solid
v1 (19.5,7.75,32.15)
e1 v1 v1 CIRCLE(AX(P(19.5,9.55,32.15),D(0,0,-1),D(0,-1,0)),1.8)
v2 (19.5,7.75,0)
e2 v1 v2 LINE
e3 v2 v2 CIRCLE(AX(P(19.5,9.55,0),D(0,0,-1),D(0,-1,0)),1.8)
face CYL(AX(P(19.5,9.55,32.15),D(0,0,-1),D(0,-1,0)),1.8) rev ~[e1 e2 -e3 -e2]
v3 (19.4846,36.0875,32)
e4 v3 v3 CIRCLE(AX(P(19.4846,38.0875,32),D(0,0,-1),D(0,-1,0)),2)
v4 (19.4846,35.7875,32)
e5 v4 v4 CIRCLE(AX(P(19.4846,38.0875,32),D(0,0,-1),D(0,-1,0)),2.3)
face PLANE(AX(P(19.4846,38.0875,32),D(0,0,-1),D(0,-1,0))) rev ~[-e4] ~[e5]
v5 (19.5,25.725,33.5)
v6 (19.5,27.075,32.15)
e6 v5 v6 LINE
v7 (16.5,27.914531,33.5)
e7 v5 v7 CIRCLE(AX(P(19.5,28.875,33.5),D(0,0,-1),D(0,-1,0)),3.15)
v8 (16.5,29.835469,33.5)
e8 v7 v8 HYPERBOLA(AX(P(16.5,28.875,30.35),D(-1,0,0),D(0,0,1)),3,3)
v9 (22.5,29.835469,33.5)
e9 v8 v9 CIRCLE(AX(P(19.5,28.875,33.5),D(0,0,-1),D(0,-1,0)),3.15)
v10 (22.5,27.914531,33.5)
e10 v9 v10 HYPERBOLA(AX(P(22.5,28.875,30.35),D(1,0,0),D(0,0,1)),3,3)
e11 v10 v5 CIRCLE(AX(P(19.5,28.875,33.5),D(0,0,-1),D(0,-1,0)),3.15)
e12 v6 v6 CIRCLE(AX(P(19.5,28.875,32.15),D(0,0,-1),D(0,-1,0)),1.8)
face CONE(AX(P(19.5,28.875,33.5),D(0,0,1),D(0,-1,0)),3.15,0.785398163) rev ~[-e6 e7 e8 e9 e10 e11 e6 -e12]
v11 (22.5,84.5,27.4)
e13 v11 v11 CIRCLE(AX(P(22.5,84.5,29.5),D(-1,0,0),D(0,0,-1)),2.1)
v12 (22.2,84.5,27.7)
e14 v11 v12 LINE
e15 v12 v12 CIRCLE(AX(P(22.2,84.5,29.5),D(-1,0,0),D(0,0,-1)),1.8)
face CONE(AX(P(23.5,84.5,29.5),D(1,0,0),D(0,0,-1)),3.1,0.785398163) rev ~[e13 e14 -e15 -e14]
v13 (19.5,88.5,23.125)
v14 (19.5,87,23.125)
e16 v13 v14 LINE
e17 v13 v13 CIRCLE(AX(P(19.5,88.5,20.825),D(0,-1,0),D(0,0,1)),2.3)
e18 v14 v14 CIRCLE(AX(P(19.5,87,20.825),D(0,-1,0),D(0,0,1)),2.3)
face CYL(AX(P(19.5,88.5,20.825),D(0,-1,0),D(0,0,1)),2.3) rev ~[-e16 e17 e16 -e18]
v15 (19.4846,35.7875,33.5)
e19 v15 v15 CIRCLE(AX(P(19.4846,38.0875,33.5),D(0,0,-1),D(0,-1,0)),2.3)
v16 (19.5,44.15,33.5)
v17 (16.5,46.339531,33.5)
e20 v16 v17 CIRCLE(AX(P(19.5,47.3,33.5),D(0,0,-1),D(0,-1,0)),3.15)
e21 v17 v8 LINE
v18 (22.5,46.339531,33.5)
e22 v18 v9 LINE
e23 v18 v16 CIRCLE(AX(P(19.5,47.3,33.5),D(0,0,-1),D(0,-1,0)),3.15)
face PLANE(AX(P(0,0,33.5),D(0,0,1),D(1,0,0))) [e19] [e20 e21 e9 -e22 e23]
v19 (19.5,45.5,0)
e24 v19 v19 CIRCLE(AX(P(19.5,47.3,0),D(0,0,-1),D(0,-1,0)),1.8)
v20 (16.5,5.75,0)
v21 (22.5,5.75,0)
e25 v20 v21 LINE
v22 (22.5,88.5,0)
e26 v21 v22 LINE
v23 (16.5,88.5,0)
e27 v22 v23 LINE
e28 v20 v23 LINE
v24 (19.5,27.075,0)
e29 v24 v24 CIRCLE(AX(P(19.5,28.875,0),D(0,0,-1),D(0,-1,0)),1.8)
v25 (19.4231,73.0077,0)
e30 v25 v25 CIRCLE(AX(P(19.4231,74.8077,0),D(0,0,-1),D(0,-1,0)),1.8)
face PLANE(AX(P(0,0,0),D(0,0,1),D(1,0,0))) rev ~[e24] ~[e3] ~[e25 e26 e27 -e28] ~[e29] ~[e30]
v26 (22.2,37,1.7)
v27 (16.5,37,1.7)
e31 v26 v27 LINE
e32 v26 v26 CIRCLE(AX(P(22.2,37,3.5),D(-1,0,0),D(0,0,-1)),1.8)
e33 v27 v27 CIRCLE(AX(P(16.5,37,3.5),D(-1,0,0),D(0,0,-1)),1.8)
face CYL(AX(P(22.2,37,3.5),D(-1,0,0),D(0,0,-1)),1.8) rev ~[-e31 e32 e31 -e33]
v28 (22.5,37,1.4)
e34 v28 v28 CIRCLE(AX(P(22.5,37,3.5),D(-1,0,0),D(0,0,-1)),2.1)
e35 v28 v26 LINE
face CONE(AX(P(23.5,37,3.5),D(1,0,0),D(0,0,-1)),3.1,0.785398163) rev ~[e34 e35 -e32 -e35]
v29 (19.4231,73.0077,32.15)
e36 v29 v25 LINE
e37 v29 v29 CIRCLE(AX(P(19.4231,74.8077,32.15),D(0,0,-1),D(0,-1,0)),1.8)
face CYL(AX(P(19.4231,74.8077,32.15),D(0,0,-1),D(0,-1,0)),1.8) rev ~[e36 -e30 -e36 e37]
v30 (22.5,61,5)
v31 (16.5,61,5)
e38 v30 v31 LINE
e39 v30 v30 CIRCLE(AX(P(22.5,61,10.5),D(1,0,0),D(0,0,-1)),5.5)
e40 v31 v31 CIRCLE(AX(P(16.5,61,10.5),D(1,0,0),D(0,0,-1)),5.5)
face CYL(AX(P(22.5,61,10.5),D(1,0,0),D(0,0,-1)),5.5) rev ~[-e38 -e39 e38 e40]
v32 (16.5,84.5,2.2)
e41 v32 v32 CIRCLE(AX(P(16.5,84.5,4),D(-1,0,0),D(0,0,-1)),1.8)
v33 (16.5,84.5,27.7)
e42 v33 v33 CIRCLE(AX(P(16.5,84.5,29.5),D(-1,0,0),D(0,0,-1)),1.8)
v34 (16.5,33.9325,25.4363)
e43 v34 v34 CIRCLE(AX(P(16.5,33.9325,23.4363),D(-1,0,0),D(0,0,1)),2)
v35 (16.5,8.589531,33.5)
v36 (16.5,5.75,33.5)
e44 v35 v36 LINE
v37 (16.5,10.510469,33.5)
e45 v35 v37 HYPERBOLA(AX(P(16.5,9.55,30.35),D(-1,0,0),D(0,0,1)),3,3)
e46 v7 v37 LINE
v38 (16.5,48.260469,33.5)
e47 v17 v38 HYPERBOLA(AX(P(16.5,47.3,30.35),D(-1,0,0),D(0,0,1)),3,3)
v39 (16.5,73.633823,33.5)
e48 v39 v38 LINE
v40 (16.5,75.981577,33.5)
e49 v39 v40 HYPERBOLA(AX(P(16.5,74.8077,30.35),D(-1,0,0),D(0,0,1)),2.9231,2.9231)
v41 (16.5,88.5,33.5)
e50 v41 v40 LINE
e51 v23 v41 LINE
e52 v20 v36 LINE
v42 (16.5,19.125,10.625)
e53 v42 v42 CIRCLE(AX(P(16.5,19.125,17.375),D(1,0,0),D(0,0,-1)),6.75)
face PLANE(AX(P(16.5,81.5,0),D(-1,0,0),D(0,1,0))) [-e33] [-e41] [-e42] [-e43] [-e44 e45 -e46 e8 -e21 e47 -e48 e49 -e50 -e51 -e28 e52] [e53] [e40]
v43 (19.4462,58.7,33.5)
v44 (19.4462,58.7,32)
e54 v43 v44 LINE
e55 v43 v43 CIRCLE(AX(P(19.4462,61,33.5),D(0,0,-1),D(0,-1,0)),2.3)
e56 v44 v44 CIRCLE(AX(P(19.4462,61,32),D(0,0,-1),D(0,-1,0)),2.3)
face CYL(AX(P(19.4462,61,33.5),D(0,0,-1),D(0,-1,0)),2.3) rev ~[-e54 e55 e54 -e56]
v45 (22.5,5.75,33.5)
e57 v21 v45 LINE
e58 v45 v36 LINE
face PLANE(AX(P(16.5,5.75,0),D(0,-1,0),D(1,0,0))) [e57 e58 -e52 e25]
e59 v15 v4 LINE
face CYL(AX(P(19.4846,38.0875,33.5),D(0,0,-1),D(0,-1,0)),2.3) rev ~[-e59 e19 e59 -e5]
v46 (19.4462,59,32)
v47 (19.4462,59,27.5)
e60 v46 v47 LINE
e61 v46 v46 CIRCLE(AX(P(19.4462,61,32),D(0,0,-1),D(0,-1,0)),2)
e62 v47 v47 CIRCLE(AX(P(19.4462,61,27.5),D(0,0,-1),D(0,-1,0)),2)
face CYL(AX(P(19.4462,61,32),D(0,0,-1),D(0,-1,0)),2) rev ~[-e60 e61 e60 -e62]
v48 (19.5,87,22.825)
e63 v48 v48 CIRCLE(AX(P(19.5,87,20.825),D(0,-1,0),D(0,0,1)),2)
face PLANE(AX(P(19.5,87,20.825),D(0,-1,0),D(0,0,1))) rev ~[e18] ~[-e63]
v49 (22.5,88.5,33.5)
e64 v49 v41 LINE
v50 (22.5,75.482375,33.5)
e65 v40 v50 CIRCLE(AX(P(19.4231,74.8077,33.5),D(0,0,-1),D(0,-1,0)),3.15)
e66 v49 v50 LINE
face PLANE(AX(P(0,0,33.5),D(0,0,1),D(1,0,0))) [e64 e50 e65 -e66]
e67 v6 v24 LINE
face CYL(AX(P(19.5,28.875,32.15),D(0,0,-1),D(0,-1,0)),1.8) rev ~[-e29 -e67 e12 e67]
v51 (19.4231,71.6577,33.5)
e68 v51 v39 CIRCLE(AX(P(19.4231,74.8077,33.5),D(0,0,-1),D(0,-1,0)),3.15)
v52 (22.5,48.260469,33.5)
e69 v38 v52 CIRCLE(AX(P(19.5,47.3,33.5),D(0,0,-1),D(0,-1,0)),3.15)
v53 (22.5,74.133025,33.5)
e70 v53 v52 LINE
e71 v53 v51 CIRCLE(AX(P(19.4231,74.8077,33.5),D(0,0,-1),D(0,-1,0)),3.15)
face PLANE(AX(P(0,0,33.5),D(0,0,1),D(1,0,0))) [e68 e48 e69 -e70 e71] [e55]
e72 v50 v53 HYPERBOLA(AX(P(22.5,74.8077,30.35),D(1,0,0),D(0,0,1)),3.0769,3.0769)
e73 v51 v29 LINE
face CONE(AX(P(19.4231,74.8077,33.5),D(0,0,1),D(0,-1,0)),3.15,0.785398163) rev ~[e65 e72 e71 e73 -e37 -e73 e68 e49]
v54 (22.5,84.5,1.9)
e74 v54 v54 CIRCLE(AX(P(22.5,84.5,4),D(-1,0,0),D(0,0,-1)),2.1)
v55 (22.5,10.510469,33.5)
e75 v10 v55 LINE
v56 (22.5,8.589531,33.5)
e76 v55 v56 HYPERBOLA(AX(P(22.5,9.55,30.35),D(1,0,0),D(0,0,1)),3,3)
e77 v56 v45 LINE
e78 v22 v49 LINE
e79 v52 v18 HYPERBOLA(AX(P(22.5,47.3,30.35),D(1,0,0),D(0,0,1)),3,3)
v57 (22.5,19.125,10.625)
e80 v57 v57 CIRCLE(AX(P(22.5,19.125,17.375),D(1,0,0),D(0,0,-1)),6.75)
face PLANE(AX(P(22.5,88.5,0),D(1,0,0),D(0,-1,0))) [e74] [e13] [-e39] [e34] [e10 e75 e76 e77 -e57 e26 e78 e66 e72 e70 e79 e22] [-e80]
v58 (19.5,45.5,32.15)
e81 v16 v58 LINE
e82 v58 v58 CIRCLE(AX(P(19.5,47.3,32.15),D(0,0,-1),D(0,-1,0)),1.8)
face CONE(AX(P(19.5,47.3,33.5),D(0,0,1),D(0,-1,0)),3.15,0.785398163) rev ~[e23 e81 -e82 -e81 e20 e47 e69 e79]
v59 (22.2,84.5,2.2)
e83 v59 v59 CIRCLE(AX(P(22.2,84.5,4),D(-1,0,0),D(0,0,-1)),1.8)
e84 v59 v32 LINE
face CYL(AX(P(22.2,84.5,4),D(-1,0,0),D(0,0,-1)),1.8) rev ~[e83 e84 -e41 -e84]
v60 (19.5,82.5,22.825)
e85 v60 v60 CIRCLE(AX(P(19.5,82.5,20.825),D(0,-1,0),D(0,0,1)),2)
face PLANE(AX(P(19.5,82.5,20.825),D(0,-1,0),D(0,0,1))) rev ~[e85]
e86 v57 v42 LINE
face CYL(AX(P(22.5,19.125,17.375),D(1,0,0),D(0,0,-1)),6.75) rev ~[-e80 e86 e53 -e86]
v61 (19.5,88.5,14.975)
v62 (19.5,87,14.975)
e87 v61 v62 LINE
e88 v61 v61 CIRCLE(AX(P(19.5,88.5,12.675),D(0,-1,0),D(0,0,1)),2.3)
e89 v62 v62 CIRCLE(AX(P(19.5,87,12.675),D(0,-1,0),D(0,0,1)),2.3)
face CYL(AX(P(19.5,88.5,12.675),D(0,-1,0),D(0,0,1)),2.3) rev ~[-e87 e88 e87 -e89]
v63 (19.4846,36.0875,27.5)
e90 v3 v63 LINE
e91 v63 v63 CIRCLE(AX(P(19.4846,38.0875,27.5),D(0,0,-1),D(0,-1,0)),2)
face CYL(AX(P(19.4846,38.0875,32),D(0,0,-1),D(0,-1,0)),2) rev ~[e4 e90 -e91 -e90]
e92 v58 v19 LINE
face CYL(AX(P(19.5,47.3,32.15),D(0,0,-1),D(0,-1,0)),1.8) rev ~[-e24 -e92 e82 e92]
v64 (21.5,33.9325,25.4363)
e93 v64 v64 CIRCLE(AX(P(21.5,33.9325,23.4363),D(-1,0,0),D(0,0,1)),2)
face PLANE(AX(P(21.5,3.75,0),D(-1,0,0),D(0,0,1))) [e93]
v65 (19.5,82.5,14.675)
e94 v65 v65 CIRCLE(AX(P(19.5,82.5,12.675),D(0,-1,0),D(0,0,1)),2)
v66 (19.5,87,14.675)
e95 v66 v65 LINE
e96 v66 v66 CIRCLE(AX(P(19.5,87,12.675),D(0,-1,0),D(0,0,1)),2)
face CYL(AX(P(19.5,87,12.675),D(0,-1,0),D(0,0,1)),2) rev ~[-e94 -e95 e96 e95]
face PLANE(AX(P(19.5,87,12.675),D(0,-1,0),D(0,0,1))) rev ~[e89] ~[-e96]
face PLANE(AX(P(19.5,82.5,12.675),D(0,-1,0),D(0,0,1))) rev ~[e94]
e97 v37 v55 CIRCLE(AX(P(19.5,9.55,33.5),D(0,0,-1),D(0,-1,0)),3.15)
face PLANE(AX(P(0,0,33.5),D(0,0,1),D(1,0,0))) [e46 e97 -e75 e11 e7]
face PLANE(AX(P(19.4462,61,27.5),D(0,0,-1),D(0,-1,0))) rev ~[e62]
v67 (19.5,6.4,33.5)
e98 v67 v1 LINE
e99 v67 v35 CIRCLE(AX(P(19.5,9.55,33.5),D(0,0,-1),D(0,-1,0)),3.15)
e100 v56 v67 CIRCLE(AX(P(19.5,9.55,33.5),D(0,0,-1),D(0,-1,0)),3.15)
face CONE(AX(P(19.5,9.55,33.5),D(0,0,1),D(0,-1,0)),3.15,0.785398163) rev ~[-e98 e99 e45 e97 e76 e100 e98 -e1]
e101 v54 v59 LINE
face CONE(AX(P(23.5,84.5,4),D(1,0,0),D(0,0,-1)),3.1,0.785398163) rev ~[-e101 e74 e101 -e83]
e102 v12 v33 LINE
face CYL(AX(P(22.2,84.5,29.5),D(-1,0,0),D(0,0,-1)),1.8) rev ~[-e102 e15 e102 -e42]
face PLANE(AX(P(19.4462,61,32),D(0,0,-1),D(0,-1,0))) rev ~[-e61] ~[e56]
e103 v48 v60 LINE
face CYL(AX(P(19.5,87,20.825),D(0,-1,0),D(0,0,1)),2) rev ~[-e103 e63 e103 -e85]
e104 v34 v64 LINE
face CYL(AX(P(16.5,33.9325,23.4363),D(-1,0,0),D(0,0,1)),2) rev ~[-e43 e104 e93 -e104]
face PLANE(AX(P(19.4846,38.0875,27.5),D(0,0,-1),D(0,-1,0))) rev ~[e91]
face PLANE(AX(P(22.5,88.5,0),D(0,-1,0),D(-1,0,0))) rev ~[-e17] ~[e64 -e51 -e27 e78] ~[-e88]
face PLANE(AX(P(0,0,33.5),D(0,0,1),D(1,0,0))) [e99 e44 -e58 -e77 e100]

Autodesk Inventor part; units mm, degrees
ref_plane "YZ Plane" through (0, 0, 0) normal (1, 0, 0) x (0, 1, 0)
ref_plane "XZ Plane" through (0, 0, 0) normal (0, 1, 0) x (-1, 0, 0)
ref_plane "Work Plane1" through (0, 0, 0) normal (0, 0, 1) x (1, 0, 0)
sketch "Sketch1" plane through (0, 0, 0) normal (0, 0, 1) x (1, 0, 0)
  line L0 (23.5, 88.5) -> (-23.5, 88.5) projected
  line L1 (-23.5, 88.5) -> (-23.5, 36.5) projected
  line L2 (-26.5, 33.5) -> (-89, 33.5) projected
  line L3 (-89, 33.5) -> (-89, -72.5) projected
  line L4 (-89, -72.5) -> (-77, -72.5) projected
  line L5 (-74, -75.5) -> (-74, -93.5) projected
  line L6 (-74, -93.5) -> (74, -93.5) projected
  line L7 (74, -93.5) -> (74, -75.5) projected
  line L8 (77, -72.5) -> (89, -72.5) projected
  line L9 (89, -72.5) -> (89, 33.5) projected
  line L10 (89, 33.5) -> (26.5, 33.5) projected
  line L11 (23.5, 36.5) -> (23.5, 88.5) projected
  line L12 (-4.5, 81.5) -> (-4.5, 36.5) projected
  line L13 (-7.5, 33.5) -> (-13.5, 33.5) projected
  line L14 (-16.5, 36.5) -> (-16.5, 81.5) projected
  line L15 (-13.5, 84.5) -> (-7.5, 84.5) projected
  line L16 (16.5, 81.5) -> (16.5, 36.5) projected
  line L17 (13.5, 33.5) -> (7.5, 33.5) projected
  line L18 (4.5, 36.5) -> (4.5, 81.5) projected
  line L19 (7.5, 84.5) -> (13.5, 84.5) projected
  line L20 (16.5, 88.5) -> (22.5, 88.5)
  line L21 (22.5, 88.5) -> (22.5, 3.75)
  line L22 (22.5, 3.75) -> (16.5, 3.75)
  line L23 (16.5, 3.75) -> (16.5, 88.5)
  line L24 (59.9, 4.75) -> (32.2, 4.75)
  arc A0 (13.5, 33.5) -> (16.5, 36.5) centre (13.5, 36.5) ccw projected
  arc A1 (4.5, 36.5) -> (7.5, 33.5) centre (7.5, 36.5) ccw projected
  arc A2 (7.5, 84.5) -> (4.5, 81.5) centre (7.5, 81.5) ccw projected
  arc A3 (16.5, 81.5) -> (13.5, 84.5) centre (13.5, 81.5) ccw projected
  arc A4 (-4.5, 81.5) -> (-7.5, 84.5) centre (-7.5, 81.5) ccw projected
  arc A5 (-7.5, 33.5) -> (-4.5, 36.5) centre (-7.5, 36.5) ccw projected
  arc A6 (-16.5, 36.5) -> (-13.5, 33.5) centre (-13.5, 36.5) ccw projected
  arc A7 (-13.5, 84.5) -> (-16.5, 81.5) centre (-13.5, 81.5) ccw projected
  arc A8 (-26.5, 33.5) -> (-23.5, 36.5) centre (-26.5, 36.5) ccw projected
  arc A9 (-74, -75.5) -> (-77, -72.5) centre (-77, -75.5) ccw projected
  arc A10 (77, -72.5) -> (74, -75.5) centre (77, -75.5) ccw projected
  arc A11 (23.5, 36.5) -> (26.5, 33.5) centre (26.5, 36.5) ccw projected
  circle A12 centre (39.125, 25.9125) radius 1.0065 projected
  circle A13 centre (72.95, 12.275) radius 1.0065 projected
  circle A14 centre (-39.125, 12.3375) radius 1.0065 projected
  circle A15 centre (-72.95, 25.975) radius 1.0065 projected
  circle A16 centre (-72.95, 12.275) radius 1.0065 projected
  circle A17 centre (-39.125, 25.9125) radius 1.0065 projected
  circle A18 centre (72.95, 25.975) radius 1.0065 projected
  circle A19 centre (39.125, 12.3375) radius 1.0065 projected
  circle A20 centre (-42.4984, -44.6666) radius 1.2295 projected
  circle A21 centre (-79, -42.3889) radius 1.2295 projected
  circle A22 centre (-19.5, 28.875) radius 1.2295 projected
  circle A23 centre (19.5, 9.55) radius 1.2295 projected
  circle A24 centre (19.5, 47.3) radius 1.2295 projected
  circle A25 centre (-19.5, 47.3) radius 1.2295 projected
  circle A26 centre (0, 74.7) radius 1.2295 projected
  circle A27 centre (-19.4231, 74.8077) radius 1.2295 projected
  circle A28 centre (19.5, 74.7) radius 1.2295 projected
  circle A29 centre (0, 49.05) radius 1.2295 projected
  circle A30 centre (19.5, 28.875) radius 1.2295 projected
  circle A31 centre (0, 19.125) radius 1.2295 projected
  circle A32 centre (-19.5, 9.55) radius 1.2295 projected
  circle A33 centre (42.5, -44.6649) radius 1.2295 projected
  circle A34 centre (79, -42.3889) radius 1.2295 projected
  circle A35 centre (21.5, -85.5) radius 1.8 projected
  circle A36 centre (-64.5, -85.5) radius 1.8 projected
  circle A37 centre (-21.5, -85.5) radius 1.8 projected
  circle A38 centre (64.5, -85.5) radius 1.8 projected
  line L25 (-58.2315, -77.6013) -> (-80.7685, -61.1541) projected
  line L26 (-82, -58.7308) -> (-82, -48.3889) projected
  line L27 (-75.8885, -45.3972) -> (-47.1423, -47.5438) projected
  line L28 (-21.1, -26.5751) -> (-21.1, -22.0813) projected
  line L29 (-46.9357, -41.5592) -> (-76, -39.3889) projected
  line L30 (-82, -36.3889) -> (-82, 1.75) projected
  line L31 (32.9914, 4.75) -> (79, 4.75) projected
  line L32 (82, -48.3889) -> (82, -58.7308) projected
  line L33 (76, -39.3889) -> (46.9371, -41.5577) projected
  line L34 (21.1, -22.0813) -> (21.1, -26.5749) projected
  line L35 (47.144, -47.5423) -> (76, -45.3889) projected
  line L36 (82, 1.75) -> (82, -36.3889) projected
  line L37 (80.7685, -61.1541) -> (58.2315, -77.6013) projected
  line L38 (57, -80.0246) -> (57, -87.5) projected
  arc A39 (55, -89.5) -> (57, -87.5) centre (55, -87.5) ccw projected
  line L39 (55, -89.5) -> (31, -89.5) projected
  arc A40 (29, -87.5) -> (31, -89.5) centre (31, -87.5) ccw projected
  line L40 (29, -87.5) -> (29, -79.2522) projected
  line L41 (14, -79.5039) -> (14, -87.5) projected
  arc A41 (12, -89.5) -> (14, -87.5) centre (12, -87.5) ccw projected
  line L42 (12, -89.5) -> (-12, -89.5) projected
  arc A42 (-14, -87.5) -> (-12, -89.5) centre (-12, -87.5) ccw projected
  line L43 (-14, -87.5) -> (-14, -79.5039) projected
  line L44 (-29, -79.2522) -> (-29, -87.5) projected
  arc A43 (-31, -89.5) -> (-29, -87.5) centre (-31, -87.5) ccw projected
  line L45 (-31, -89.5) -> (-55, -89.5) projected
  arc A44 (-57, -87.5) -> (-55, -89.5) centre (-55, -87.5) ccw projected
  line L46 (-57, -87.5) -> (-57, -80.0246) projected
  line L47 (-66.95, 28.9125) -> (-45.125, 28.9125) projected
  line L48 (-42.125, 25.9125) -> (-42.125, 12.275) projected
  line L49 (-45.125, 9.275) -> (-66.95, 9.275) projected
  line L50 (-69.95, 12.275) -> (-69.95, 25.9125) projected
  line L51 (-16.5, 12.75) -> (-16.5, 25.5) projected
  line L52 (-13.5, 28.5) -> (-7.5, 28.5) projected
  line L53 (-4.5, 25.5) -> (-4.5, 12.75) projected
  line L54 (-7.5, 9.75) -> (-13.5, 9.75) projected
  line L55 (66.95, 9.3375) -> (45.125, 9.3375) projected
  line L56 (42.125, 12.3375) -> (42.125, 25.975) projected
  line L57 (45.125, 28.975) -> (66.95, 28.975) projected
  line L58 (69.95, 25.975) -> (69.95, 12.3375) projected
  line L59 (4.5, 12.75) -> (4.5, 25.5) projected
  line L60 (7.5, 28.5) -> (13.5, 28.5) projected
  line L61 (16.5, 25.5) -> (16.5, 12.75) projected
  line L62 (13.5, 9.75) -> (7.5, 9.75) projected
  line L63 (44.5181, -40.6102) -> (28.0504, -22.9209) projected
  line L64 (27.268, -20.5154) -> (30.0132, 2.1113) projected
  line L65 (-44.7206, -49.1201) -> (-29.3549, -77.8368) projected
  line L66 (-79, 4.75) -> (-32.9914, 4.75) projected
  line L67 (-30.0132, 2.1113) -> (-27.268, -20.5155) projected
  line L68 (-28.0502, -22.9208) -> (-44.5164, -40.6115) projected
  line L69 (29.3549, -77.8368) -> (44.7222, -49.1185) projected
  line L70 (-14.6042, -77.6983) -> (-37.8537, -46.8489) projected
  line L71 (-37.4786, -42.8259) -> (-22.0793, -28.7924) projected
  line L72 (-21.1218, -21.72) -> (-23.9255, 1.3887) projected
  line L73 (-20.9474, 4.75) -> (20.9474, 4.75) projected
  line L74 (23.9255, 1.3887) -> (21.1218, -21.72) projected
  line L75 (22.0795, -28.7925) -> (37.4798, -42.8243) projected
  line L76 (37.8551, -46.8475) -> (14.6042, -77.6983) projected
  circle A45 centre (-78, -67.1725) radius 1.2295 projected
  arc A46 (79, -39.3889) -> (82, -36.3889) centre (79, -36.3889) ccw projected
  arc A47 (44.5181, -40.6102) -> (46.9371, -41.5577) centre (46.7138, -38.566) ccw projected
  arc A48 (27.268, -20.5154) -> (28.0504, -22.9209) centre (30.2461, -20.8767) ccw projected
  arc A49 (32.9914, 4.75) -> (30.0132, 2.1113) centre (32.9914, 1.75) ccw projected
  arc A50 (82, 1.75) -> (79, 4.75) centre (79, 1.75) ccw projected
  arc A51 (-42.125, 25.9125) -> (-45.125, 28.9125) centre (-45.125, 25.9125) ccw projected
  arc A52 (-45.125, 9.275) -> (-42.125, 12.275) centre (-45.125, 12.275) ccw projected
  arc A53 (-69.95, 12.275) -> (-66.95, 9.275) centre (-66.95, 12.275) ccw projected
  arc A54 (-66.95, 28.9125) -> (-69.95, 25.9125) centre (-66.95, 25.9125) ccw projected
  arc A55 (-13.5, 28.5) -> (-16.5, 25.5) centre (-13.5, 25.5) ccw projected
  arc A56 (-4.5, 25.5) -> (-7.5, 28.5) centre (-7.5, 25.5) ccw projected
  arc A57 (-7.5, 9.75) -> (-4.5, 12.75) centre (-7.5, 12.75) ccw projected
  arc A58 (-16.5, 12.75) -> (-13.5, 9.75) centre (-13.5, 12.75) ccw projected
  arc A59 (58.2315, -77.6013) -> (57, -80.0246) centre (60, -80.0246) ccw projected
  arc A60 (29.3549, -77.8368) -> (29, -79.2522) centre (32, -79.2522) ccw projected
  arc A61 (47.144, -47.5423) -> (44.7222, -49.1185) centre (47.3673, -50.5339) ccw projected
  arc A62 (82, -48.3889) -> (79, -45.3889) centre (79, -48.3889) ccw projected
  arc A63 (80.7685, -61.1541) -> (82, -58.7308) centre (79, -58.7308) ccw projected
  arc A64 (-21.1, -22.0813) -> (-21.1218, -21.72) centre (-24.1, -22.0813) ccw projected
  arc A65 (-20.9474, 4.75) -> (-23.9255, 1.3887) centre (-20.9474, 1.75) ccw projected
  arc A66 (23.9255, 1.3887) -> (20.9474, 4.75) centre (20.9474, 1.75) ccw projected
  arc A67 (21.1218, -21.72) -> (21.1, -22.0813) centre (24.1, -22.0813) ccw projected
  arc A68 (21.1, -26.5749) -> (22.0795, -28.7925) centre (24.1, -26.5749) ccw projected
  arc A69 (37.8551, -46.8475) -> (37.4798, -42.8243) centre (35.4593, -45.0419) ccw projected
  arc A70 (14.6042, -77.6983) -> (14, -79.5039) centre (17, -79.5039) ccw projected
  arc A71 (-14, -79.5039) -> (-14.6042, -77.6983) centre (-17, -79.5039) ccw projected
  arc A72 (-37.4786, -42.8259) -> (-37.8537, -46.8489) centre (-35.4579, -45.0433) ccw projected
  arc A73 (-22.0793, -28.7924) -> (-21.1, -26.5751) centre (-24.1, -26.5751) ccw projected
  arc A74 (-82, -36.3889) -> (-79, -39.3889) centre (-79, -36.3889) ccw projected
  arc A75 (-79, 4.75) -> (-82, 1.75) centre (-79, 1.75) ccw projected
  arc A76 (-30.0132, 2.1113) -> (-32.9914, 4.75) centre (-32.9914, 1.75) ccw projected
  arc A77 (-28.0502, -22.9208) -> (-27.268, -20.5155) centre (-30.2461, -20.8769) ccw projected
  arc A78 (-46.9357, -41.5592) -> (-44.5164, -40.6115) centre (-46.7123, -38.5676) ccw projected
  arc A79 (7.5, 28.5) -> (4.5, 25.5) centre (7.5, 25.5) ccw projected
  arc A80 (16.5, 25.5) -> (13.5, 28.5) centre (13.5, 25.5) ccw projected
  arc A81 (13.5, 9.75) -> (16.5, 12.75) centre (13.5, 12.75) ccw projected
  arc A82 (4.5, 12.75) -> (7.5, 9.75) centre (7.5, 12.75) ccw projected
  arc A83 (-57, -80.0246) -> (-58.2315, -77.6013) centre (-60, -80.0246) ccw projected
  arc A84 (-82, -58.7308) -> (-80.7685, -61.1541) centre (-79, -58.7308) ccw projected
  arc A85 (-75.8885, -45.3972) -> (-76.1119, -45.3889) centre (-76.1119, -48.3889) ccw projected
  arc A86 (-44.7206, -49.1201) -> (-47.1423, -47.5438) centre (-47.3657, -50.5355) ccw projected
  arc A87 (-29, -79.2522) -> (-29.3549, -77.8368) centre (-32, -79.2522) ccw projected
  arc A88 (42.125, 12.3375) -> (45.125, 9.3375) centre (45.125, 12.3375) ccw projected
  arc A89 (45.125, 28.975) -> (42.125, 25.975) centre (45.125, 25.975) ccw projected
  arc A90 (69.95, 25.975) -> (66.95, 28.975) centre (66.95, 25.975) ccw projected
  arc A91 (66.95, 9.3375) -> (69.95, 12.3375) centre (66.95, 12.3375) ccw projected
  circle A92 centre (78, -67.1725) radius 1.2295 projected
  line L77 (-22.5, 25.9125) -> (-22.5, 12.55) projected
  arc A93 (-25.5, 9.55) -> (-22.5, 12.55) centre (-25.5, 12.55) ccw projected
  line L78 (-25.5, 9.55) -> (-33.125, 9.55) projected
  arc A94 (-36.125, 12.55) -> (-33.125, 9.55) centre (-33.125, 12.55) ccw projected
  line L79 (-36.125, 12.55) -> (-36.125, 25.9125) projected
  arc A95 (-33.125, 28.9125) -> (-36.125, 25.9125) centre (-33.125, 25.9125) ccw projected
  line L80 (-33.125, 28.9125) -> (-25.5, 28.9125) projected
  arc A96 (-22.5, 25.9125) -> (-25.5, 28.9125) centre (-25.5, 25.9125) ccw projected
  line L81 (76, -45.3889) -> (79, -45.3889) projected
  line L82 (79, -39.3889) -> (76, -39.3889) projected
  line L83 (33.125, 9.275) -> (25.5, 9.275) projected
  arc A97 (22.5, 12.275) -> (25.5, 9.275) centre (25.5, 12.275) ccw projected
  line L84 (22.5, 12.275) -> (22.5, 25.9125) projected
  arc A98 (25.5, 28.9125) -> (22.5, 25.9125) centre (25.5, 25.9125) ccw projected
  line L85 (25.5, 28.9125) -> (33.125, 28.9125) projected
  arc A99 (36.125, 25.9125) -> (33.125, 28.9125) centre (33.125, 25.9125) ccw projected
  line L86 (36.125, 25.9125) -> (36.125, 12.275) projected
  arc A100 (33.125, 9.275) -> (36.125, 12.275) centre (33.125, 12.275) ccw projected
  line L87 (-83, 28.975) -> (-78.95, 28.975) projected
  arc A101 (-75.95, 25.975) -> (-78.95, 28.975) centre (-78.95, 25.975) ccw projected
  line L88 (-75.95, 25.975) -> (-75.95, 12.275) projected
  arc A102 (-78.95, 9.275) -> (-75.95, 12.275) centre (-78.95, 12.275) ccw projected
  line L89 (-78.95, 9.275) -> (-83, 9.275) projected
  arc A103 (-86, 12.275) -> (-83, 9.275) centre (-83, 12.275) ccw projected
  line L90 (-86, 12.275) -> (-86, 25.975) projected
  arc A104 (-83, 28.975) -> (-86, 25.975) centre (-83, 25.975) ccw projected
  arc A105 (-79, -45.3889) -> (-82, -48.3889) centre (-79, -48.3889) ccw projected
  line L91 (-79, -45.3889) -> (-76.1119, -45.3889) projected
  line L92 (-76, -39.3889) -> (-79, -39.3889) projected
  line L93 (78.95, 28.975) -> (83, 28.975) projected
  arc A106 (86, 25.975) -> (83, 28.975) centre (83, 25.975) ccw projected
  line L94 (86, 25.975) -> (86, 12.275) projected
  arc A107 (83, 9.275) -> (86, 12.275) centre (83, 12.275) ccw projected
  line L95 (83, 9.275) -> (78.95, 9.275) projected
  arc A108 (75.95, 12.275) -> (78.95, 9.275) centre (78.95, 12.275) ccw projected
  line L96 (75.95, 12.275) -> (75.95, 25.975) projected
  arc A109 (78.95, 28.975) -> (75.95, 25.975) centre (78.95, 25.975) ccw projected
  circle A110 centre (-24.1, -73.1) radius 1.2295 projected
  circle A111 centre (24.1, -24.9) radius 1.2295 projected
  circle A112 centre (-24.1, -24.9) radius 1.2295 projected
  circle A113 centre (24.1, -73.1) radius 1.2295 projected
  point P0 (0, 0)
  point P1 (7.5, 81.5)
  point P2 (13.5, 81.5)
  point P3 (-7.5, 81.5)
  point P4 (-13.5, 81.5)
  point P5 (-77, -75.5)
  point P6 (39, -44.2094)
  point P7 (16.5, 28.5)
  point P8 (16.5, 9.75)
  point P9 (-79, -67.8878)
  point P10 (-79, -66.4572)
  dimension "d0" = 1
  dimension "d1" = 1
ref_plane "Work Plane2" through (-89, -40.3889, 33.5) normal (0, 0, 1) x (1, 0, 0)
extrude "Extrusion1" add sketch "Sketch1" along normal up to surface (33.5 mm away) contours L21 A66 L73 L23 L16 L0 | L21 L22 L23 L73 A66 | A23 | A24 | A28 | A30
sketch "Sketch2" plane through (22.5, 3.75, 0) normal (1, 0, 0) x (0, 0, -1)
  circle A0 centre (-17.375, 15.375) radius 6.75 projected
  circle A1 centre (-10.5, 57.25) radius 5.5 projected
  point P0 (0, -3.75)
  dimension "d8" = 11
extrude "Extrusion2" cut sketch "Sketch2" against normal up to next
sketch "Sketch3" plane through (16.5, 3.75, 0) normal (-1, 0, 0) x (0, 0, 1)
  circle A0 centre (23.4363, 30.1825) radius 2 projected
  point P0 (0, -3.75)
extrude "Extrusion3" cut sketch "Sketch3" against normal blind 5
ref_plane "Work Plane3" through (23.5, 3.75, 0) normal (1, 0, 0) x (0, 0, -1)
sketch "Sketch4" plane through (23.5, 3.75, 0) normal (1, 0, 0) x (0, 0, -1)
  circle A0 centre (-29.5, 80.75) radius 1.8 projected
  circle A1 centre (-3.5, 33.25) radius 1.8 projected
  circle A2 centre (-4, 80.75) radius 1.8 projected
  point P0 (0, -3.75)
hole "Hole1" at (23.5, 37, 3.5) at (23.5, 84.5, 4) at (23.5, 84.5, 29.5) direction (-1, 0, 0) diameter 3.6 end through all countersink diameter 6.2 countersink angle 90 clearance for "Countersunk Flat Head Screw ISO 2009/7046" size "M3" standard "ISO"
sketch "Sketch5" plane through (16.5, 3.75, 33.5) normal (0, 0, 1) x (1, 0, 0)
  circle A0 centre (-36, 5.8) radius 1.8 projected
  circle A1 centre (-36, 25.125) radius 1.8 projected
  circle A2 centre (-36, 43.55) radius 1.8 projected
  circle A3 centre (-35.9231, 71.0577) radius 1.8 projected
  circle A4 centre (-16.5, 45.3) radius 3.3 projected
  circle A5 centre (-16.5, 15.375) radius 3.3 projected
  circle A6 centre (-16.5, 70.95) radius 3.3 projected
  line L0 (-12, 2) -> (-21, 2) projected
  line L1 (-12, 84.75) -> (-12, 2) projected
  line L2 (-21, 84.75) -> (-12, 84.75) projected
  line L3 (-21, 2) -> (-21, 84.75) projected
  line L4 (-16.5, 2) -> (-16.5, 84.75)
  circle A7 centre (3, 5.8) radius 1.8
  circle A8 centre (3, 25.125) radius 1.8
  circle A9 centre (3, 43.55) radius 1.8
  circle A10 centre (2.9231, 71.0577) radius 1.8
  circle A11 centre (-16.5, 30.7161) radius 2.3 projected
  circle A12 centre (-16.5, 59.25) radius 2.3 projected
  point P0 (-16.5, -3.75)
hole "Hole2" at (19.5, 9.55, 33.5) at (19.5, 28.875, 33.5) at (19.5, 47.3, 33.5) at (19.4231, 74.8077, 33.5) direction (0, 0, -1) diameter 3.6 end through all countersink diameter 6.3 countersink angle 90 clearance for "Countersunk Flat Head Screw ISO 2009/7046" size "M3" standard "ISO"
sketch "Sketch7" plane through (16.5, 88.5, 0) normal (0, 1, 0) x (1, 0, 0)
  line L0 (0, -33.5) -> (6, -33.5) projected
  line L1 (6, 0) -> (6, -33.5) projected
  line L2 (6, 0) -> (0, 0) projected
  line L3 (0, 0) -> (0, -33.5) projected
  circle A0 centre (-16.5, -12.675) radius 2 projected
  circle A1 centre (-16.5, -20.825) radius 2 projected
  line L4 (-16.5, -20.825) -> (6, -20.825)
  line L5 (-16.5, -12.675) -> (6, -12.675)
  line L6 (6, -5) -> (6, -16) projected
  point P0 (-16.5, 0)
  point P1 (3, -20.825)
  point P2 (3, -12.675)
hole "Hole4" at (19.5, 88.5, 20.825) at (19.5, 88.5, 12.675) direction (0, -1, 0) diameter 4 depth 6 counterbore diameter 4.6 counterbore depth 1.5
sketch "Sketch8" plane through (19.5, 47.3, 33.5) normal (0, 0, 1) x (1, 0, 0)
  circle A0 centre (-39, -9.2125) radius 2.3 projected
  circle A1 centre (-39, 13.7) radius 2.3 projected
  arc A2 (3, 0.9605) -> (-3, 0.9605) centre (0, 0) ccw projected
  line L0 (3, 26.8331) -> (3, 0.9605) projected
  arc A3 (-3, 26.3338) -> (3, 26.8331) centre (-0.0769, 27.5077) ccw projected
  line L1 (-3, 0.9605) -> (-3, 26.3338) projected
  arc A4 (-3, -0.9605) -> (3, -0.9605) centre (0, 0) ccw projected
  line L2 (-3, -17.4645) -> (-3, -0.9605) projected
  arc A5 (3, -17.4645) -> (-3, -17.4645) centre (0, -18.425) ccw projected
  line L3 (3, -0.9605) -> (3, -17.4645) projected
  line L4 (-39, 13.7) -> (3, 13.7)
  line L5 (3, 19.2) -> (3, 8.2) projected
  line L6 (-39, -9.2125) -> (3, -9.2125)
  circle A6 centre (0, -18.425) radius 1.8 projected
  line L7 (0, -18.425) -> (-0.0769, 27.5077)
  point P0 (-19.5, -47.3)
  point P1 (-0.0538, 13.7)
  point P2 (-0.0154, -9.2125)
hole "Hole5" at (19.4462, 61, 33.5) at (19.4846, 38.0875, 33.5) direction (0, 0, -1) diameter 4 depth 6 counterbore diameter 4.6 counterbore depth 1.5
sketch "Sketch9" plane through (16.5, 3.75, 0) normal (0, -1, 0) x (1, 0, 0)
  line L0 (0, 0) -> (0, 33.5) projected
  line L1 (0, 0) -> (6, 0) projected
  line L2 (6, 0) -> (6, 33.5) projected
  line L3 (6, 33.5) -> (0, 33.5) projected
  point P0 (-16.5, 0)
extrude "Extrusion4" cut sketch "Sketch9" against normal blind 2
properties part number "left_gear_holder" material "Nylon 6/6"
